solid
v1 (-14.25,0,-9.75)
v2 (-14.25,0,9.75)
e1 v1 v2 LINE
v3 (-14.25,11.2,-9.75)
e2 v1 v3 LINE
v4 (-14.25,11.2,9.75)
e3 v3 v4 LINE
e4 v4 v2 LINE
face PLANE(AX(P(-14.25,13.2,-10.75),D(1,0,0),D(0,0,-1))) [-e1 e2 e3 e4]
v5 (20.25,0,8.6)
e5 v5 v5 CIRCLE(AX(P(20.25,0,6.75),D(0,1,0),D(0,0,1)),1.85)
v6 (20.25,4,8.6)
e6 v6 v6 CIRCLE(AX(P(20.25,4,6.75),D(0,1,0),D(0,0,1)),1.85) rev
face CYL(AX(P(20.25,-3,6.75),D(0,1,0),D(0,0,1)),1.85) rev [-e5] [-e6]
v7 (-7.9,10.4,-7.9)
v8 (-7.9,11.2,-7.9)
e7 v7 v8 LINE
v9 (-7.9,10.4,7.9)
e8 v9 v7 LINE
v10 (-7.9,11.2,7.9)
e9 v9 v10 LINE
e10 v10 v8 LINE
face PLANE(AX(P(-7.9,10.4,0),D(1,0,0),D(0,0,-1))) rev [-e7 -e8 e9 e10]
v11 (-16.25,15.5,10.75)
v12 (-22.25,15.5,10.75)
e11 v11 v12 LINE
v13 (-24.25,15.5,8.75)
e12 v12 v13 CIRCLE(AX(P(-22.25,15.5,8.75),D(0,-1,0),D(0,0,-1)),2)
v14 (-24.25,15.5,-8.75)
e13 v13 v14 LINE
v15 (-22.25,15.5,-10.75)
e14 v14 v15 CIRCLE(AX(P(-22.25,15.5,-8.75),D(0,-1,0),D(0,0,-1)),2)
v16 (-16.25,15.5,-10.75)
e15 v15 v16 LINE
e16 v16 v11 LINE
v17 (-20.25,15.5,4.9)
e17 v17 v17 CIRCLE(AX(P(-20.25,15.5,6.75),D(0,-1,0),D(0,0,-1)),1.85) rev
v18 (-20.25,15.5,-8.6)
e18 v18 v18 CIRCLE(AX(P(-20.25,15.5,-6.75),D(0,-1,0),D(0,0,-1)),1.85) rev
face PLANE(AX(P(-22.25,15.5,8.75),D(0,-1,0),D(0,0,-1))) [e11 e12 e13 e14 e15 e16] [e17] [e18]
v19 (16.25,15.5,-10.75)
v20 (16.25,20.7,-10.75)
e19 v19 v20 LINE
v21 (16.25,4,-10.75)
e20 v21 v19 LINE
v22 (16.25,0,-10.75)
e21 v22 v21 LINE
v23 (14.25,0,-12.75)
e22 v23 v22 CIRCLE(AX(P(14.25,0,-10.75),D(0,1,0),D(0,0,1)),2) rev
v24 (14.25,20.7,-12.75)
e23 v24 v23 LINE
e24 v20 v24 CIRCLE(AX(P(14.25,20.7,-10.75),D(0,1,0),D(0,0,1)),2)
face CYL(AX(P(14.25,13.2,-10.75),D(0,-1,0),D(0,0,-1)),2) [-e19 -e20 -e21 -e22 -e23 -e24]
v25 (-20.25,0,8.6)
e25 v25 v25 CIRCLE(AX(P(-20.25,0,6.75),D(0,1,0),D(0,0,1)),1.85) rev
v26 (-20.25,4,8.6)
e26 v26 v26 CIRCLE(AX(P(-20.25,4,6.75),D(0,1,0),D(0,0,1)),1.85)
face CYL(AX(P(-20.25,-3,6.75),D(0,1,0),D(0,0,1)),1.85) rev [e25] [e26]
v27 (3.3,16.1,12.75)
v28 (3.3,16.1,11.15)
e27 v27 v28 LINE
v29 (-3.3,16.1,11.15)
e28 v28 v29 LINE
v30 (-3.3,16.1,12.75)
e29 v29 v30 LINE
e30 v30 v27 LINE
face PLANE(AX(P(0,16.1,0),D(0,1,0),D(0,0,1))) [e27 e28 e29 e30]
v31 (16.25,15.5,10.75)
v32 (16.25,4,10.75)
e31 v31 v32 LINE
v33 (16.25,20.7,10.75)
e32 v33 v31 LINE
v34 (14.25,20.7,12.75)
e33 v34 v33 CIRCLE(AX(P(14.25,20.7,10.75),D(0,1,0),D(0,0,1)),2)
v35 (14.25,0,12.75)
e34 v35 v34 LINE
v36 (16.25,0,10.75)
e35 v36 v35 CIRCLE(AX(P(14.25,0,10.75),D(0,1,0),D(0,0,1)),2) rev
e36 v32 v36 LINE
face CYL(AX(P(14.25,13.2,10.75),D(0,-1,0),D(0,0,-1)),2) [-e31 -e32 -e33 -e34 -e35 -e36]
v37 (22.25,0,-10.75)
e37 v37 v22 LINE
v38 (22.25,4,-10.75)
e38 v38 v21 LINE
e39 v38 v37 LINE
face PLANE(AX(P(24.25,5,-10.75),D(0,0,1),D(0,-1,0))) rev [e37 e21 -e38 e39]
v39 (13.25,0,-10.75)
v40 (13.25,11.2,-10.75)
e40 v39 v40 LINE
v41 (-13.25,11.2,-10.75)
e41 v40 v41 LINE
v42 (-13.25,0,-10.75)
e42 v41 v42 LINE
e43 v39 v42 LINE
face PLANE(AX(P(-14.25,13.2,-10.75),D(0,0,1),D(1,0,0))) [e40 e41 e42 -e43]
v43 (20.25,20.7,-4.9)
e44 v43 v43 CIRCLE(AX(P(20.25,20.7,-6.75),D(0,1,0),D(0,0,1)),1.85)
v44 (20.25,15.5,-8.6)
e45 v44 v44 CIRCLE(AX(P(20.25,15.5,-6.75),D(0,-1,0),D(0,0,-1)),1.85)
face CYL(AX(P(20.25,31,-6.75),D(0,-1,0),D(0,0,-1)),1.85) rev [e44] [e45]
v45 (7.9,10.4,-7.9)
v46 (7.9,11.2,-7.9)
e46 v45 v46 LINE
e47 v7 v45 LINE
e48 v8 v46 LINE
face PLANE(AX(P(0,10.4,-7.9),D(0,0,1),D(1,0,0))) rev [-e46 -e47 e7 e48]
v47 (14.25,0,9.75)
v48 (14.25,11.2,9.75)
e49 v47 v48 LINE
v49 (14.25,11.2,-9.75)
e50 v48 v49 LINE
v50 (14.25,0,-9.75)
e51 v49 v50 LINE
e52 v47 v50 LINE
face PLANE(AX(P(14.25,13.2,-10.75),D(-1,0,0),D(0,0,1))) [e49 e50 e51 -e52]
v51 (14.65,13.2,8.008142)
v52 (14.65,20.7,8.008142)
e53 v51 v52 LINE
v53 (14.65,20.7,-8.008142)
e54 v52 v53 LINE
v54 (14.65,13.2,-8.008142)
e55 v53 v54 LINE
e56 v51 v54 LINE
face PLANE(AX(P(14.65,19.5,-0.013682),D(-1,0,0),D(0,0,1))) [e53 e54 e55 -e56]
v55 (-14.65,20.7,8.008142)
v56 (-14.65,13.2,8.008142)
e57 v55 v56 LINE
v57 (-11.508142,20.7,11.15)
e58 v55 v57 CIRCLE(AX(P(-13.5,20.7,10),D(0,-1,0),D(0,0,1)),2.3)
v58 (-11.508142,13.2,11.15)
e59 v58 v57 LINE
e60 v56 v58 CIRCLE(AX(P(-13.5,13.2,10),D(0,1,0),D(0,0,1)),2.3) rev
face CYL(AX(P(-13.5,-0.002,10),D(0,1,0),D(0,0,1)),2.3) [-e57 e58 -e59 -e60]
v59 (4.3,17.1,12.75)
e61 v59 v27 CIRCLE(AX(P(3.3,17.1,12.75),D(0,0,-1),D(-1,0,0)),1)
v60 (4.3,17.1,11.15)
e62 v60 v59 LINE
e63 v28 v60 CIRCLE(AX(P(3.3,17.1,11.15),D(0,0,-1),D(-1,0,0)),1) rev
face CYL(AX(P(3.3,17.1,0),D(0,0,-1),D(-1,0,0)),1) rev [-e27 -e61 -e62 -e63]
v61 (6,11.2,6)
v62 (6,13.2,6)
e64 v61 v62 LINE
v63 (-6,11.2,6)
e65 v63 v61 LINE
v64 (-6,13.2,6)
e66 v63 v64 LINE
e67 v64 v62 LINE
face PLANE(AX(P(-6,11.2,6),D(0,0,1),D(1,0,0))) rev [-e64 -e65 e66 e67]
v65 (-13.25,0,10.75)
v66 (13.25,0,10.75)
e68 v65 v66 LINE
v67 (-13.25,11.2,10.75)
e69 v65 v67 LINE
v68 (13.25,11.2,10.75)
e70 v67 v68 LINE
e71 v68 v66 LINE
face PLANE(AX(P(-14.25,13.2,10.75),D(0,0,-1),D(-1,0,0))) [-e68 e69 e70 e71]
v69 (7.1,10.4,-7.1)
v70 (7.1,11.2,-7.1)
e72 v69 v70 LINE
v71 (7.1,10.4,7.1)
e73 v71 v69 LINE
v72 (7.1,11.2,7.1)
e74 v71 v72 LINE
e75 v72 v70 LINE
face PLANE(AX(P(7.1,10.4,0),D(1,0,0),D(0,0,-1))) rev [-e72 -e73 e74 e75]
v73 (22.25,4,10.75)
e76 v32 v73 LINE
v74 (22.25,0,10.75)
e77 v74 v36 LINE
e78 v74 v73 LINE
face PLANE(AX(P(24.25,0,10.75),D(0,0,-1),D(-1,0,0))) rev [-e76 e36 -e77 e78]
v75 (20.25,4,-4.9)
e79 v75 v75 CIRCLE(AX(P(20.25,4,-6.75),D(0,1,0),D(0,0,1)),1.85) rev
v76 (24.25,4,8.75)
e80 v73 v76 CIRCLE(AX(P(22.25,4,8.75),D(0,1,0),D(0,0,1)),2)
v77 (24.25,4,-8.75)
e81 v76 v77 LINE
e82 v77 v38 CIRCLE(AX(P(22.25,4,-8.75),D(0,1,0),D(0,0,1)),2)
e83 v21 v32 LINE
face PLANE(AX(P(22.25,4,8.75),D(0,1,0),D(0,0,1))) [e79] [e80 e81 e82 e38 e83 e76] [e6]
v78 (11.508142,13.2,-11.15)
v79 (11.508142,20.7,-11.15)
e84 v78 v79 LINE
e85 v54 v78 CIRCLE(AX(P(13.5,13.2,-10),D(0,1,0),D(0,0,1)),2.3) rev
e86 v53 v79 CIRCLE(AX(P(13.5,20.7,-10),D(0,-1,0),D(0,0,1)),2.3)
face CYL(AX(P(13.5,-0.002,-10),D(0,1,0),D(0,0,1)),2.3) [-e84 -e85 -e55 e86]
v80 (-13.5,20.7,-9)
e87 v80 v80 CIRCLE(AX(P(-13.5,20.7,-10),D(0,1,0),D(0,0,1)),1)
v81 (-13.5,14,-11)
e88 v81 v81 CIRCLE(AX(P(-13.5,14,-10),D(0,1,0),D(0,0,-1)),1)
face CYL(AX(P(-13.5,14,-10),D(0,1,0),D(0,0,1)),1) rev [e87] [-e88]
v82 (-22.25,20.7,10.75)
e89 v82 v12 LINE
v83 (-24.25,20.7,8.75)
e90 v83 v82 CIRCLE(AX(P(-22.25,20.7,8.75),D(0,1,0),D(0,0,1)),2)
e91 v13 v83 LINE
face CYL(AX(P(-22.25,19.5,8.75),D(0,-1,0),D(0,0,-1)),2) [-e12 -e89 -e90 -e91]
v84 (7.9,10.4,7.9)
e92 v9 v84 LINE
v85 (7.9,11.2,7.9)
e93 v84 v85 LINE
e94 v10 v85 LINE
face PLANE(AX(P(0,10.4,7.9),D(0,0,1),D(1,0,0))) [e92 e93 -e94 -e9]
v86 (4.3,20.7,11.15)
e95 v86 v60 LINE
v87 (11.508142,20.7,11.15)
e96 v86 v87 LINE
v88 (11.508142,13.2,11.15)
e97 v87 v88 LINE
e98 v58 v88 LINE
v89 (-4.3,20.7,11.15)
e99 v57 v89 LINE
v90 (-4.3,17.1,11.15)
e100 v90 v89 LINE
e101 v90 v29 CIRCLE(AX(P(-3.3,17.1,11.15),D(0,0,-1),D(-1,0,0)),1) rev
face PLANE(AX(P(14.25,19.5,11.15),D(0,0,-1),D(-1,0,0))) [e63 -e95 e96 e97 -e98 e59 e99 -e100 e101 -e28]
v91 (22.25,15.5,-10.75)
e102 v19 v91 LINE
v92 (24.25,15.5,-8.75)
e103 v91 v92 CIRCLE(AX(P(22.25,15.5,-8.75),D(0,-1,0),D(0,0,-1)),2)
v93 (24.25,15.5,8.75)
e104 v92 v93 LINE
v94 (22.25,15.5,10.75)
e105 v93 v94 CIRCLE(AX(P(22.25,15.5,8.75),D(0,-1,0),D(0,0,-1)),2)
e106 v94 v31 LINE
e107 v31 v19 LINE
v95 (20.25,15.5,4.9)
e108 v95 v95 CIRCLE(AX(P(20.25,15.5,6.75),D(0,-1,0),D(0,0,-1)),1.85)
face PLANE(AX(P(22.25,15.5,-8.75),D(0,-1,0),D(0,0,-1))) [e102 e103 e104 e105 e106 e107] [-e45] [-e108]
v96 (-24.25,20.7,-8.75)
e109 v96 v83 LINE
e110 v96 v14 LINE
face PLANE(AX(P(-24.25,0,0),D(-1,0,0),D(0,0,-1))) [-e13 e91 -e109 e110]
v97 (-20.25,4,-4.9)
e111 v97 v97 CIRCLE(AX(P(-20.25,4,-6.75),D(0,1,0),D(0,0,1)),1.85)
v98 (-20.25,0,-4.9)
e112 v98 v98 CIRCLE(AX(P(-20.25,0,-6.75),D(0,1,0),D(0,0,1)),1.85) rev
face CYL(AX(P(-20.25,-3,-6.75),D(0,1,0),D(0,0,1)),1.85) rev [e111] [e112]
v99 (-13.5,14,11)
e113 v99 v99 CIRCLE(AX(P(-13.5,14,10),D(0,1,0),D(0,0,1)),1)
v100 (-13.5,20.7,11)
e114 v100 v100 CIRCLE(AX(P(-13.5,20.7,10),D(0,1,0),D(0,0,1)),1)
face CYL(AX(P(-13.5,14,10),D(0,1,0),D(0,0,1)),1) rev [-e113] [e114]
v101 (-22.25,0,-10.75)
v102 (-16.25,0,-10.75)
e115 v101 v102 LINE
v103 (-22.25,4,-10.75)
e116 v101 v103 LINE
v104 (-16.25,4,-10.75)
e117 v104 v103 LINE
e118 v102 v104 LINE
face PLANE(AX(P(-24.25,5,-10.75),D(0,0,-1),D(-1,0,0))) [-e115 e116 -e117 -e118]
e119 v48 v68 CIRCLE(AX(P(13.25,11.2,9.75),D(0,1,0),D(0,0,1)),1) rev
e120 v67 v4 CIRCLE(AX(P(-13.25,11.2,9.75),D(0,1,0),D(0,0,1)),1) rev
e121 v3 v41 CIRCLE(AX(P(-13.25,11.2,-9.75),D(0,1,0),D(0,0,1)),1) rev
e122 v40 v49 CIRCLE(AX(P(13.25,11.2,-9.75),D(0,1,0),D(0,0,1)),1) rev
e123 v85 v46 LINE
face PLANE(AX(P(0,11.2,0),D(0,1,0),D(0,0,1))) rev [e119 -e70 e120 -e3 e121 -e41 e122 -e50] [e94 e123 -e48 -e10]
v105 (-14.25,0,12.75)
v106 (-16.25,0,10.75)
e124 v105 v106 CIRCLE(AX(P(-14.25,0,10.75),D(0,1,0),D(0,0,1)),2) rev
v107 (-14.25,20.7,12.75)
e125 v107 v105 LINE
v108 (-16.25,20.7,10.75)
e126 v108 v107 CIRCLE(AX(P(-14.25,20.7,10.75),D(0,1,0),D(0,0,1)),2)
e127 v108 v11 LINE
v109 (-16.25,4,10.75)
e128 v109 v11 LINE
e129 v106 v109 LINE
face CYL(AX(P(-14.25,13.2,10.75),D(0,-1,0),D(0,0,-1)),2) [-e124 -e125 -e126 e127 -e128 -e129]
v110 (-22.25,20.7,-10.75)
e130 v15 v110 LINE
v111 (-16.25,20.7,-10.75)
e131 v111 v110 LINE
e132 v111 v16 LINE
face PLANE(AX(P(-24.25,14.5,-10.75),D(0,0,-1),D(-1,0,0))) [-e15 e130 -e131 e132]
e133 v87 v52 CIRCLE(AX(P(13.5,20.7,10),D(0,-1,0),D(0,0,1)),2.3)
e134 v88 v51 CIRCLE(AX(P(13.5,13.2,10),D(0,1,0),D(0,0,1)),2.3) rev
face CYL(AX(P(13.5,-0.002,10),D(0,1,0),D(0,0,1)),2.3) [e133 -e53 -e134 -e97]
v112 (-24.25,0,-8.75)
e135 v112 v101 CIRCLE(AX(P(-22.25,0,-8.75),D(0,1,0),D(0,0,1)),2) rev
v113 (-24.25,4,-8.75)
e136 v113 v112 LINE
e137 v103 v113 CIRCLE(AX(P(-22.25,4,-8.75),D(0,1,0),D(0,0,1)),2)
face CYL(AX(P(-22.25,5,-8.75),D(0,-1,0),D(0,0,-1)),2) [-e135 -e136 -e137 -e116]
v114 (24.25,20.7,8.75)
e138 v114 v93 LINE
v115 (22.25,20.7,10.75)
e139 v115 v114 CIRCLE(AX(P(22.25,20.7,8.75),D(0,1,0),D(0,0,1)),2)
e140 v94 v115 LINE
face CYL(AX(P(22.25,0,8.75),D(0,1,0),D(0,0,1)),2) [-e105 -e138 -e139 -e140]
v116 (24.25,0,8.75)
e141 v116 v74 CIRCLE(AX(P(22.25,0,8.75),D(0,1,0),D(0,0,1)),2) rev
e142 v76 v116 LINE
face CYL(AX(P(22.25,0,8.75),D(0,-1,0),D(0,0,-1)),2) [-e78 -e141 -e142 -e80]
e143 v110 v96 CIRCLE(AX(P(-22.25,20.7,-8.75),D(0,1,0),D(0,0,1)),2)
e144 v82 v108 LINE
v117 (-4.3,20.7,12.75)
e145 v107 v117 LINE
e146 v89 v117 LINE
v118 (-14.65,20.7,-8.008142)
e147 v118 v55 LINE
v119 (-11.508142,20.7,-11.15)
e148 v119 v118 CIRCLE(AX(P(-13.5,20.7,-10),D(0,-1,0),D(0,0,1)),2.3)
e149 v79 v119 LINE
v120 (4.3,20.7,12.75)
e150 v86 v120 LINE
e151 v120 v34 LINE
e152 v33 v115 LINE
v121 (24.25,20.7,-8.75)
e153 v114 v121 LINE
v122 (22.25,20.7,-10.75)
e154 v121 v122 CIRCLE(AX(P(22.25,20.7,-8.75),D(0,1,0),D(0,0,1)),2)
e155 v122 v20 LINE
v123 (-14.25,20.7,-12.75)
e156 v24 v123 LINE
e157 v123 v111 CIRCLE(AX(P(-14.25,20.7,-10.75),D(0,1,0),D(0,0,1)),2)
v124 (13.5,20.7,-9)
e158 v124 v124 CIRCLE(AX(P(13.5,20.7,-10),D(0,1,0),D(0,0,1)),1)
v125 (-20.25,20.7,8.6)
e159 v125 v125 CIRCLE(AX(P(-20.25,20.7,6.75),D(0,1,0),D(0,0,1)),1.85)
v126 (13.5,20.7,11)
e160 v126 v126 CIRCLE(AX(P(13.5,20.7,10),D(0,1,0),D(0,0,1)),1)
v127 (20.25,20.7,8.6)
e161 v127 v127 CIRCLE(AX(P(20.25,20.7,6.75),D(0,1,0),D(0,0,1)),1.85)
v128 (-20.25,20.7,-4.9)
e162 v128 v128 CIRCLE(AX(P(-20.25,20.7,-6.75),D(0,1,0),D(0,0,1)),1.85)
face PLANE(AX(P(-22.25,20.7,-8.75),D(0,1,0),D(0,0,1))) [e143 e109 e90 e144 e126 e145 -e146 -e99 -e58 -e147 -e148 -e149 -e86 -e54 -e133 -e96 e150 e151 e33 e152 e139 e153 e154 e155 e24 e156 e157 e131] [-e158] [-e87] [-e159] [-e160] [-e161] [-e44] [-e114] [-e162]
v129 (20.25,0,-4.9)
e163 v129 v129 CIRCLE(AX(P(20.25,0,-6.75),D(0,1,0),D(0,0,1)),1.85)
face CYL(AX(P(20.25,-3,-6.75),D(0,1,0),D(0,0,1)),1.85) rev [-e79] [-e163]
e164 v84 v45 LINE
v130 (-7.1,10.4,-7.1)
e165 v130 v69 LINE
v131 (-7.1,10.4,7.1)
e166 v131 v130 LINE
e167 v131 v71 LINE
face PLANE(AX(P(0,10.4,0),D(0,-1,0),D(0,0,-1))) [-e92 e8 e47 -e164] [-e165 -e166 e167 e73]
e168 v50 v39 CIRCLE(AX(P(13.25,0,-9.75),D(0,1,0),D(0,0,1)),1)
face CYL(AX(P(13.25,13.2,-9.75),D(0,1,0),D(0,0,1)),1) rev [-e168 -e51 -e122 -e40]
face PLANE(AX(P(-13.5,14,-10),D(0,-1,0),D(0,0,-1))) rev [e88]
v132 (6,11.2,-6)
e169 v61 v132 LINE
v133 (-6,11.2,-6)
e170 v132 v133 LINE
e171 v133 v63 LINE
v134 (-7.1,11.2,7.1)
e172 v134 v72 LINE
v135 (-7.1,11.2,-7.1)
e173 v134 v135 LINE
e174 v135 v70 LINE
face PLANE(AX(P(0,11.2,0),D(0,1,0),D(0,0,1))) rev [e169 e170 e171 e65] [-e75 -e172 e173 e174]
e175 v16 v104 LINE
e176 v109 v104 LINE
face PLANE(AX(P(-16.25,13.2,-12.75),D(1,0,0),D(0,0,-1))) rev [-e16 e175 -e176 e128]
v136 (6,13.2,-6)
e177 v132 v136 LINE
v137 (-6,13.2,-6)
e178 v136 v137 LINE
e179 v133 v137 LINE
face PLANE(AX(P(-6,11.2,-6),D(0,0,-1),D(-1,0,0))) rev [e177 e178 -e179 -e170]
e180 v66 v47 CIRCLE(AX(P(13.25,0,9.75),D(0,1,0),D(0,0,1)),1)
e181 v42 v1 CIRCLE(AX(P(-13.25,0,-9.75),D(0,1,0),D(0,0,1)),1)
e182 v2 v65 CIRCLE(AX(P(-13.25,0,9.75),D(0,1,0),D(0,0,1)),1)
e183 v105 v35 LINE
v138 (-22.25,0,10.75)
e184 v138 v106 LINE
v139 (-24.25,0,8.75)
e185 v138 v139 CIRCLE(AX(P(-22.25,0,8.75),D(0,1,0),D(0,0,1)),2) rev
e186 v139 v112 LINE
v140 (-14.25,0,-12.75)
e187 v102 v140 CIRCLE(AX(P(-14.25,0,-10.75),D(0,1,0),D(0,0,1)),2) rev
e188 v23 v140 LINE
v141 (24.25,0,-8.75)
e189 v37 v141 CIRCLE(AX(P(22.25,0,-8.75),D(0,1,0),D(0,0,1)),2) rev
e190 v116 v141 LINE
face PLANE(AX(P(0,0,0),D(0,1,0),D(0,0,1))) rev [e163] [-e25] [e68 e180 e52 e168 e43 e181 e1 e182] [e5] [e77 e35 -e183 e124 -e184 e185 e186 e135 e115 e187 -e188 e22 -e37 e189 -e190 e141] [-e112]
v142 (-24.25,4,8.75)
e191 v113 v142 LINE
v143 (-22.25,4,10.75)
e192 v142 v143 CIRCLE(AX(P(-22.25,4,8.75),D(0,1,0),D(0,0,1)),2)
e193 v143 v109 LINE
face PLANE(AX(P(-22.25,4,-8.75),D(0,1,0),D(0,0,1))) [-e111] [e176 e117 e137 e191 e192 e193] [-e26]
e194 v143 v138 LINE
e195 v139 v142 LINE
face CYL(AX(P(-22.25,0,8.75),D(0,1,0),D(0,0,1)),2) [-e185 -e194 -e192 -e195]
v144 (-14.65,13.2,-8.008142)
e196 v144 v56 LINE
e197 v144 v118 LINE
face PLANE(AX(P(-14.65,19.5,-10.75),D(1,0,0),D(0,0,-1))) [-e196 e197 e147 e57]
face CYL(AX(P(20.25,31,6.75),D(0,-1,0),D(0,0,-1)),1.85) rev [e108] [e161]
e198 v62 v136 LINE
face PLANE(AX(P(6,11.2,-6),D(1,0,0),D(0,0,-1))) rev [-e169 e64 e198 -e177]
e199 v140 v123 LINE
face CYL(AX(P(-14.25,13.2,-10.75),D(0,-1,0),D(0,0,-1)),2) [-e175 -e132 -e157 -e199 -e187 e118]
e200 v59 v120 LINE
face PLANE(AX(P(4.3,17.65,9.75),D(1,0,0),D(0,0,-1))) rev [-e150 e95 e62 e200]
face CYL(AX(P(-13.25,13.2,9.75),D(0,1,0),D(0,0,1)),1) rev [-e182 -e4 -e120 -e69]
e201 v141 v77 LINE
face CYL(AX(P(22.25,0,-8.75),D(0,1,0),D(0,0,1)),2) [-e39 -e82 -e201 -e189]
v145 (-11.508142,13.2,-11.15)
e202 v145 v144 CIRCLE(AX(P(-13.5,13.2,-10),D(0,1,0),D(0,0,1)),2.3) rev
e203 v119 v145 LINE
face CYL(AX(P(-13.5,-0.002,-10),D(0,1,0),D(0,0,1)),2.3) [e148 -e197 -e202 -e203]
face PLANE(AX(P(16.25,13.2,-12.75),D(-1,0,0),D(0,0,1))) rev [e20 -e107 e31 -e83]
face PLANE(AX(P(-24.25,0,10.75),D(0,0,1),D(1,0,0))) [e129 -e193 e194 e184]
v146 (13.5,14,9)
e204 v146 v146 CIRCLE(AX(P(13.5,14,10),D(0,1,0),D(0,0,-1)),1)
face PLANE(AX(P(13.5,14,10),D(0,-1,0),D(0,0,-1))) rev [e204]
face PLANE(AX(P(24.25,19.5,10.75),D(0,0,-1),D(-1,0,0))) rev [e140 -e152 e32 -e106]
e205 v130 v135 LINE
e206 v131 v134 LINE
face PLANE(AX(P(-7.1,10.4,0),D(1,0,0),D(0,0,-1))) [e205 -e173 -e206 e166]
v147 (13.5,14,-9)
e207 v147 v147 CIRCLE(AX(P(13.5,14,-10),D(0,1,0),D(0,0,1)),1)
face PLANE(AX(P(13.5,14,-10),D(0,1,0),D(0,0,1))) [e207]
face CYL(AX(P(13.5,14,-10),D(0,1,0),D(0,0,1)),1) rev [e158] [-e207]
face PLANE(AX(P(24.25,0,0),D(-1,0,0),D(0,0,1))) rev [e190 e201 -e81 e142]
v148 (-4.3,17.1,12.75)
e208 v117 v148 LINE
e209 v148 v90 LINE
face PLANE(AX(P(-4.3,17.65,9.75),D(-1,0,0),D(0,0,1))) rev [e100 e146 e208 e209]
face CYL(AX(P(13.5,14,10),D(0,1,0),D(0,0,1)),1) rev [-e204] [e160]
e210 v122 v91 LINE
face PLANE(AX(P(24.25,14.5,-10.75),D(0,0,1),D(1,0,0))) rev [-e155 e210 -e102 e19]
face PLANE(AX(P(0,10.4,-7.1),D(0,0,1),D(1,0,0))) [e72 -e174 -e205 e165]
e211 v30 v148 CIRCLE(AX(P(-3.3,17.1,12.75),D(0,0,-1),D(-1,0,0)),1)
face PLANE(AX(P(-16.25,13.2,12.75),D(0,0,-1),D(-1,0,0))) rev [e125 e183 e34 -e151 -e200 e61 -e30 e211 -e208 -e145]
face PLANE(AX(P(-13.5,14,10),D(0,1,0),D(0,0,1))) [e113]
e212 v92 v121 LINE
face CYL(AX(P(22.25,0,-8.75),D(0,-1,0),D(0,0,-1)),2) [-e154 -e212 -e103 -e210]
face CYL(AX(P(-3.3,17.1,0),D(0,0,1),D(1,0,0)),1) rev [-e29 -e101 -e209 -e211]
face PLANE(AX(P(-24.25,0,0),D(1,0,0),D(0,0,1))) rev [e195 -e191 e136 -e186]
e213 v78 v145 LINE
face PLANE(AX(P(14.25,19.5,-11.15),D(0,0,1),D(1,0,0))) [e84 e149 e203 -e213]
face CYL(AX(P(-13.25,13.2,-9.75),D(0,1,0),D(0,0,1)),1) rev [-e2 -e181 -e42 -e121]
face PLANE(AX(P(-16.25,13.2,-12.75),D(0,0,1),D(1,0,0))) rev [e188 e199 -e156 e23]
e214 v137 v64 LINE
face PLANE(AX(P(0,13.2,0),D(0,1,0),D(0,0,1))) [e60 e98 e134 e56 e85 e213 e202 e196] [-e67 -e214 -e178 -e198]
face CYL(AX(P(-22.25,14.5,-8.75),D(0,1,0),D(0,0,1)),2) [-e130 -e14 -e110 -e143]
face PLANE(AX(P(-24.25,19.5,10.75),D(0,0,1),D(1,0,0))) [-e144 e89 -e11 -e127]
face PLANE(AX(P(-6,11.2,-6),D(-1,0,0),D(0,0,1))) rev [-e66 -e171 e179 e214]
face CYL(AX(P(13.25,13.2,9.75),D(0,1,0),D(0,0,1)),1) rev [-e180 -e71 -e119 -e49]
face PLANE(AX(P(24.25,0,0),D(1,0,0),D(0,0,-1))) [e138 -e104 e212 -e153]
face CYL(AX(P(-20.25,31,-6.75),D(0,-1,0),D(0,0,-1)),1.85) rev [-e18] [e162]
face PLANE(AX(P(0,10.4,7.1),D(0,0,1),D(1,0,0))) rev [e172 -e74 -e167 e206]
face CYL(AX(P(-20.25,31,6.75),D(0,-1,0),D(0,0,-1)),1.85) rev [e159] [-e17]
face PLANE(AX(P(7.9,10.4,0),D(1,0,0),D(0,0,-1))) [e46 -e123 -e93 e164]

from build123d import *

# Parameters (mm, degrees)
SKETCH_1_W             = 32.5
SKETCH_1_H             = 25.5
SKETCH_1_W_2           = 28.5
SKETCH_1_H_2           = 21.5
EXTRUDE_1_DEPTH        = 13.2
SKETCH_2_W             = 28.5
SKETCH_2_H             = 21.5
SKETCH_2_W_2           = 12
SKETCH_2_H_2           = 12
EXTRUDE_2_DEPTH        = 2
EXTRUDE_3_DEPTH        = 6.3
EXTRUDE_4_REACH        = 30.406
SKETCH_6_R             = 2.7
SKETCH_7_R             = 1
CUT_EXTRUDE_3_DEPTH    = 5.5
SKETCH_10_W            = 15.8
SKETCH_10_H            = 15.8
SKETCH_10_W_2          = 14.2
SKETCH_10_H_2          = 14.2
EXTRUDE_5_DEPTH        = 0.8
CUT_EXTRUDE_5_DEPTH    = 3
FILLET_6_R             = 0.5
FILLET_1_R             = 2
FILLET_2_R             = 1
SKETCH_12_W            = 21.5
SKETCH_12_H            = 5
EXTRUDE_7_DEPTH        = 8
SKETCH_13_R            = 1.85
CUT_EXTRUDE_7_DEPTH    = 8
FILLET_7_R             = 2
SKETCH_15_W            = 21.5
SKETCH_15_H            = 5
EXTRUDE_8_DEPTH        = 8
CUT_EXTRUDE_START      = 26
SKETCH_13_3_R          = 1.85
CUT_EXTRUDE_8_DEPTH    = 26
FILLET_8_R             = 2
FILLET_7_OF_MIRROR_1_R = 2
FILLET_8_OF_MIRROR_1_R = 2
MOVE_START             = 13.2
MOVE_FACE_2_DEPTH      = 6.3
MOVE_FACE_3_BY         = 0.3
MOVE_FACE_3_2_BY       = 0.3
MOVE_FACE_3_3_BY       = 0.3
MOVE_FACE_3_4_BY       = 0.3
MOVE_FACE_3_5_BY       = 0.3
MOVE_FACE_3_6_BY       = 0.3
MOVE_FACE_3_7_BY       = 0.3
MOVE_FACE_3_8_BY       = 0.3
MOVE_FACE_3_9_BY       = 0.3
MOVE_FACE_3_10_BY      = 0.3
MOVE_FACE_3_11_BY      = 0.3
MOVE_FACE_3_12_BY      = 0.3
CUT_EXTRUDE_9_DEPTH    = 1
CUT_EXTRUDE_10_DEPTH   = 1
CUT_EXTRUDE_11_DEPTH   = 1
CUT_EXTRUDE_12_DEPTH   = 1
EXTRUDE_START          = 1.2
SKETCH_23_R            = 1.85
SKETCH_23_R_2          = 1
EXTRUDE_9_DEPTH        = 1.2
SKETCH_25_W            = 2
SKETCH_25_H            = 4.682452006
CUT_EXTRUDE_13_DEPTH   = 8.6
EXTRUDE_11_OUTLINE_W   = 8.6
EXTRUDE_11_OUTLINE_H   = 1.6
EXTRUDE_11_DEPTH       = 1.6
FILLET_9_R             = 1


# Read off the part's stored shape, not the designer's step: 移动面2, 凸台-拉伸11
with BuildPart() as part:
    # 草图1 → 凸台-拉伸1 (new body)
    with BuildSketch(Plane(origin=(0, 0, 0), x_dir=(1, 0, 0), z_dir=(0, 1, 0))):
        Rectangle(SKETCH_1_W, SKETCH_1_H)
        Rectangle(SKETCH_1_W_2, SKETCH_1_H_2, mode=Mode.SUBTRACT)
    extrude(amount=EXTRUDE_1_DEPTH)

    # 草图2 → 凸台-拉伸2 (add)
    with BuildSketch(Plane(origin=(0, 13.2, 0), x_dir=(1, 0, 0), z_dir=(0, 1, 0))):
        Rectangle(SKETCH_2_W, SKETCH_2_H)
        Rectangle(SKETCH_2_W_2, SKETCH_2_H_2, mode=Mode.SUBTRACT)
    extrude(amount=-EXTRUDE_2_DEPTH)

    # 草图3 → 凸台-拉伸3 (add)
    with BuildSketch(Plane(origin=(0, 13.2, 0), x_dir=(1, 0, 0), z_dir=(0, 1, 0))):
        Polygon((-16.25, -12.75), (-16.25, 12.75), (16.25, 12.75), (16.25, -0.040360215), (16.25, -12.75), align=None)
        Polygon((14.25, 0.013681835), (14.25, 10.75), (-14.25, 10.75), (-14.25, -10.75), (14.25, -10.75), align=None, mode=Mode.SUBTRACT)
    extrude(amount=EXTRUDE_3_DEPTH)

    # 草图6 → 凸台-拉伸4 (add, up to next)
    with BuildSketch(Plane(origin=(0, 19.5, 0), x_dir=(1, 0, 0), z_dir=(0, 1, 0)), mode=Mode.PRIVATE) as extrude_4_sk1:
        with Locations((13.5, 10)):
            Circle(SKETCH_6_R)
    extrude_4_tool1 = extrude(extrude_4_sk1.sketch, amount=-EXTRUDE_4_REACH, mode=Mode.PRIVATE) - part.part
    # 草图6 → 凸台-拉伸4 (add, up to next)
    with BuildSketch(Plane(origin=(0, 19.5, 0), x_dir=(1, 0, 0), z_dir=(0, 1, 0)), mode=Mode.PRIVATE) as extrude_4_sk2:
        with Locations((13.5, -10)):
            Circle(SKETCH_6_R)
    extrude_4_tool2 = extrude(extrude_4_sk2.sketch, amount=-EXTRUDE_4_REACH, mode=Mode.PRIVATE) - part.part
    # 草图6 → 凸台-拉伸4 (add, up to next)
    with BuildSketch(Plane(origin=(0, 19.5, 0), x_dir=(1, 0, 0), z_dir=(0, 1, 0)), mode=Mode.PRIVATE) as extrude_4_sk3:
        with Locations((-13.5, -10)):
            Circle(SKETCH_6_R)
    extrude_4_tool3 = extrude(extrude_4_sk3.sketch, amount=-EXTRUDE_4_REACH, mode=Mode.PRIVATE) - part.part
    # 草图6 → 凸台-拉伸4 (add, up to next)
    with BuildSketch(Plane(origin=(0, 19.5, 0), x_dir=(1, 0, 0), z_dir=(0, 1, 0)), mode=Mode.PRIVATE) as extrude_4_sk4:
        with Locations((-13.5, 10)):
            Circle(SKETCH_6_R)
    extrude_4_tool4 = extrude(extrude_4_sk4.sketch, amount=-EXTRUDE_4_REACH, mode=Mode.PRIVATE) - part.part
    add(extrude_4_tool1.solids().sort_by_distance((13.5, 19.5, -10))[0])
    add(extrude_4_tool2.solids().sort_by_distance((13.5, 19.5, 10))[0])
    add(extrude_4_tool3.solids().sort_by_distance((-13.5, 19.5, 10))[0])
    add(extrude_4_tool4.solids().sort_by_distance((-13.5, 19.5, -10))[0])

    # 草图7 → 切除-拉伸3 (cut)
    with BuildSketch(Plane(origin=(0, 19.5, 0), x_dir=(1, 0, 0), z_dir=(0, 1, 0))):
        with Locations(Location((13.5, 10, 0), (0, 0, 270))):
            Circle(SKETCH_7_R)
        with Locations(Location((13.5, -10, 0), (0, 0, 90))):
            Circle(SKETCH_7_R)
        with Locations(Location((-13.5, -10, 0), (0, 0, 270))):
            Circle(SKETCH_7_R)
        with Locations(Location((-13.5, 10, 0), (0, 0, 90))):
            Circle(SKETCH_7_R)
    extrude(amount=-CUT_EXTRUDE_3_DEPTH, mode=Mode.SUBTRACT)

    # 草图10 → 凸台-拉伸5 (add)
    with BuildSketch(Plane.XZ.offset(-11.2)):
        Rectangle(SKETCH_10_W, SKETCH_10_H)
        Rectangle(SKETCH_10_W_2, SKETCH_10_H_2, mode=Mode.SUBTRACT)
    extrude(amount=EXTRUDE_5_DEPTH)

    # 草图11 → 切除-拉伸5 (cut)
    with BuildSketch(Plane.XY.offset(12.75)):
        Polygon((-4, 17.65), (4, 17.65), (4, 15.8), (3, 14.8), (-3, 14.8), (-4, 15.8), align=None)
    extrude(amount=-CUT_EXTRUDE_5_DEPTH, mode=Mode.SUBTRACT)

    # 圆角6
    fillet_6_edges = [part.edges().sort_by_distance(p)[0] for p in [
        (4, 17.65, 11.75),
        (4, 15.8, 11.75),
        (3, 14.8, 11.75),
        (-3, 14.8, 11.75),
        (-4, 15.8, 11.75),
        (-4, 17.65, 11.75),
    ]]
    fillet(fillet_6_edges, radius=FILLET_6_R)

    # 圆角1
    fillet_1_edges = [part.edges().sort_by_distance(p)[0] for p in [
        (16.25, 9.75, 12.75),
        (-16.25, 9.75, 12.75),
        (-16.25, 9.75, -12.75),
        (16.25, 9.75, -12.75),
    ]]
    fillet(fillet_1_edges, radius=FILLET_1_R)

    # 圆角2
    fillet_2_edges = [part.edges().sort_by_distance(p)[0] for p in [
        (-14.25, 5.6, 10.75),
        (14.25, 5.6, 10.75),
        (-14.25, 5.6, -10.75),
        (14.25, 5.6, -10.75),
    ]]
    fillet(fillet_2_edges, radius=FILLET_2_R)

    # 草图12 → 凸台-拉伸7 (add)
    with BuildSketch(Plane(origin=(16.25, 0, 0), x_dir=(0, 0, -1), z_dir=(1, 0, 0))):
        with Locations((0, 2.5)):
            Rectangle(SKETCH_12_W, SKETCH_12_H)
    extrude_7 = extrude(amount=EXTRUDE_7_DEPTH)

    # 草图13 → 切除-拉伸7 (cut)
    with BuildSketch(Plane(origin=(0, 5, 0), x_dir=(1, 0, 0), z_dir=(0, 1, 0))):
        with Locations(Location((20.25, 6.75, 0), (0, 0, 270))):
            Circle(SKETCH_13_R)
        with Locations(Location((20.25, -6.75, 0), (0, 0, 270))):
            Circle(SKETCH_13_R)
    cut_extrude_7 = extrude(amount=-CUT_EXTRUDE_7_DEPTH, mode=Mode.SUBTRACT)

    # 圆角7
    fillet_7_edges = [part.edges().sort_by_distance(p)[0] for p in [
        (24.25, 2.5, -10.75),
        (24.25, 2.5, 10.75),
    ]]
    fillet(fillet_7_edges, radius=FILLET_7_R)

    # 草图15 → 凸台-拉伸8 (add)
    with BuildSketch(Plane(origin=(16.25, 0, 0), x_dir=(0, 0, -1), z_dir=(1, 0, 0))):
        with Locations((0, 17)):
            Rectangle(SKETCH_15_W, SKETCH_15_H)
    extrude_8 = extrude(amount=EXTRUDE_8_DEPTH)

    # 草图13<3> → 切除-拉伸8 (cut)
    with BuildSketch(Plane(origin=(0, 5, 0), x_dir=(1, 0, 0), z_dir=(0, 1, 0)).offset(CUT_EXTRUDE_START)):
        with Locations(Location((20.25, 6.75, 0), (0, 0, 270))):
            Circle(SKETCH_13_3_R)
        with Locations(Location((20.25, -6.75, 0), (0, 0, 270))):
            Circle(SKETCH_13_3_R)
    cut_extrude_8 = extrude(amount=-CUT_EXTRUDE_8_DEPTH, mode=Mode.SUBTRACT)

    # 圆角8
    fillet_8_edges = [part.edges().sort_by_distance(p)[0] for p in [
        (24.25, 17, -10.75),
        (24.25, 17, 10.75),
    ]]
    fillet(fillet_8_edges, radius=FILLET_8_R)

    # 镜向1: 凸台-拉伸7, 切除-拉伸7, 凸台-拉伸8, 切除-拉伸8 across plane
    add(extrude_7.mirror(Plane(origin=(0, 0, 0), x_dir=(0, 0, 1), z_dir=(1, 0, 0))))
    add(cut_extrude_7.mirror(Plane(origin=(0, 0, 0), x_dir=(0, 0, 1), z_dir=(1, 0, 0))), mode=Mode.SUBTRACT)
    add(extrude_8.mirror(Plane(origin=(0, 0, 0), x_dir=(0, 0, 1), z_dir=(1, 0, 0))))
    add(cut_extrude_8.mirror(Plane(origin=(0, 0, 0), x_dir=(0, 0, 1), z_dir=(1, 0, 0))), mode=Mode.SUBTRACT)

    # 圆角7 of 镜向1
    fillet_7_of_mirror_1_edges = [part.edges().sort_by_distance(p)[0] for p in [
        (-24.25, 2.5, -10.75),
        (-24.25, 2.5, 10.75),
    ]]
    fillet(fillet_7_of_mirror_1_edges, radius=FILLET_7_OF_MIRROR_1_R)

    # 圆角8 of 镜向1
    fillet_8_of_mirror_1_edges = [part.edges().sort_by_distance(p)[0] for p in [
        (-24.25, 17, -10.75),
        (-24.25, 17, 10.75),
    ]]
    fillet(fillet_8_of_mirror_1_edges, radius=FILLET_8_OF_MIRROR_1_R)

    # Move Face 2 outline → Move Face 2 (cut)
    with BuildSketch(Plane(origin=(0, 0, 0), x_dir=(1, 0, 0), z_dir=(0, 1, 0)).offset(MOVE_START)):
        with BuildLine():
            ThreePointArc((11.508141571, -11.15), (11.873654403, -8.373654403), (14.65, -8.008141571))
            Line((14.65, -8.008141571), (14.65, 8.008141571))
            ThreePointArc((14.65, 8.008141571), (11.873654403, 8.373654403), (11.508141571, 11.15))
            Line((11.508141571, 11.15), (-11.508141571, 11.15))
            ThreePointArc((-11.508141571, 11.15), (-11.873654403, 8.373654403), (-14.65, 8.008141571))
            Line((-14.65, 8.008141571), (-14.65, -8.008141571))
            ThreePointArc((-14.65, -8.008141571), (-11.873654403, -8.373654403), (-11.508141571, -11.15))
            Line((-11.508141571, -11.15), (11.508141571, -11.15))
        make_face()
        with BuildLine():
            Line((10.90625753, -10.75), (-10.90625753, -10.75))
            ThreePointArc((-10.90625753, -10.75), (-11.590811691, -8.090811691), (-14.25, -7.40625753))
            Line((-14.25, -7.40625753), (-14.25, 7.40625753))
            ThreePointArc((-14.25, 7.40625753), (-11.590811691, 8.090811691), (-10.90625753, 10.75))
            Line((-10.90625753, 10.75), (10.90625753, 10.75))
            ThreePointArc((10.90625753, 10.75), (11.590811691, 8.090811691), (14.25, 7.40625753))
            Line((14.25, 7.40625753), (14.25, -7.40625753))
            ThreePointArc((14.25, -7.40625753), (11.590811691, -8.090811691), (10.90625753, -10.75))
        make_face(mode=Mode.SUBTRACT)
    extrude(amount=MOVE_FACE_2_DEPTH, mode=Mode.SUBTRACT)

    # Move Face 3: a curved face moved inward by 0.3
    add(Solid.thicken(part.faces().sort_by_distance((2.984234935, 14.838060234, 11.95))[0], -MOVE_FACE_3_BY), mode=Mode.SUBTRACT)

    # Move Face 3 2: a face moved inward by 0.3
    extrude(part.faces().sort_by_distance((3.5, 15.3, 11.95))[0], amount=MOVE_FACE_3_2_BY, dir=(0.707106781, -0.707106781, 0), mode=Mode.SUBTRACT)

    # Move Face 3 3: a curved face moved inward by 0.3
    add(Solid.thicken(part.faces().sort_by_distance((3.961939766, 15.815765065, 11.95))[0], -MOVE_FACE_3_3_BY), mode=Mode.SUBTRACT)

    # Move Face 3 4: a curved face moved inward by 0.3
    add(Solid.thicken(part.faces().sort_by_distance((3.853553391, 17.503553391, 11.95))[0], -MOVE_FACE_3_4_BY), mode=Mode.SUBTRACT)

    # Move Face 3 5: a face moved inward by 0.3
    extrude(part.faces().sort_by_distance((4, 16.578553391, 11.95))[0], amount=MOVE_FACE_3_5_BY, dir=(1, 0, 0), mode=Mode.SUBTRACT)

    # Move Face 3 6: a face moved inward by 0.3
    extrude(part.faces().sort_by_distance((0, 17.65, 11.95))[0], amount=MOVE_FACE_3_6_BY, dir=(0, 1, 0), mode=Mode.SUBTRACT)

    # Move Face 3 7: a curved face moved inward by 0.3
    add(Solid.thicken(part.faces().sort_by_distance((-3.853553391, 17.503553391, 11.95))[0], -MOVE_FACE_3_7_BY), mode=Mode.SUBTRACT)

    # Move Face 3 8: a face moved inward by 0.3
    extrude(part.faces().sort_by_distance((-4, 16.578553391, 11.95))[0], amount=MOVE_FACE_3_8_BY, dir=(-1, 0, 0), mode=Mode.SUBTRACT)

    # Move Face 3 9: a curved face moved inward by 0.3
    add(Solid.thicken(part.faces().sort_by_distance((-3.961939766, 15.815765065, 11.95))[0], -MOVE_FACE_3_9_BY), mode=Mode.SUBTRACT)

    # Move Face 3 10: a face moved inward by 0.3
    extrude(part.faces().sort_by_distance((-3.5, 15.3, 11.95))[0], amount=MOVE_FACE_3_10_BY, dir=(-0.707106781, -0.707106781, 0), mode=Mode.SUBTRACT)

    # Move Face 3 11: a curved face moved inward by 0.3
    add(Solid.thicken(part.faces().sort_by_distance((-2.984234935, 14.838060234, 11.95))[0], -MOVE_FACE_3_11_BY), mode=Mode.SUBTRACT)

    # Move Face 3 12: a face moved inward by 0.3
    extrude(part.faces().sort_by_distance((0, 14.8, 11.95))[0], amount=MOVE_FACE_3_12_BY, dir=(0, -1, 0), mode=Mode.SUBTRACT)

    # 草图17 → 切除-拉伸9 (cut)
    with BuildSketch(Plane(origin=(0, 5, 0), x_dir=(1, 0, 0), z_dir=(0, 1, 0))):
        with BuildLine():
            Line((16.25, -10.75), (22.25, -10.75))
            ThreePointArc((22.25, -10.75), (23.664213562, -10.164213562), (24.25, -8.75))
            Line((24.25, -8.75), (24.25, 8.75))
            ThreePointArc((24.25, 8.75), (23.664213562, 10.164213562), (22.25, 10.75))
            Line((22.25, 10.75), (16.25, 10.75))
            Line((16.25, 10.75), (16.25, -10.75))
        make_face()
    extrude(amount=-CUT_EXTRUDE_9_DEPTH, mode=Mode.SUBTRACT)

    # 草图18 → 切除-拉伸10 (cut)
    with BuildSketch(Plane.XZ.offset(-14.5)):
        with BuildLine():
            Line((24.25, -8.75), (24.25, 8.75))
            ThreePointArc((24.25, 8.75), (23.664213562, 10.164213562), (22.25, 10.75))
            Line((22.25, 10.75), (16.25, 10.75))
            Line((16.25, 10.75), (16.25, -10.75))
            Line((16.25, -10.75), (22.25, -10.75))
            ThreePointArc((22.25, -10.75), (23.664213562, -10.164213562), (24.25, -8.75))
        make_face()
    extrude(amount=-CUT_EXTRUDE_10_DEPTH, mode=Mode.SUBTRACT)

    # 草图19 → 切除-拉伸11 (cut)
    with BuildSketch(Plane.XZ.offset(-14.5)):
        with BuildLine():
            Line((-16.25, 10.75), (-22.25, 10.75))
            ThreePointArc((-22.25, 10.75), (-23.664213562, 10.164213562), (-24.25, 8.75))
            Line((-24.25, 8.75), (-24.25, -8.75))
            ThreePointArc((-24.25, -8.75), (-23.664213562, -10.164213562), (-22.25, -10.75))
            Line((-22.25, -10.75), (-16.25, -10.75))
            Line((-16.25, -10.75), (-16.25, 10.75))
        make_face()
    extrude(amount=-CUT_EXTRUDE_11_DEPTH, mode=Mode.SUBTRACT)

    # 草图20 → 切除-拉伸12 (cut)
    with BuildSketch(Plane(origin=(0, 5, 0), x_dir=(1, 0, 0), z_dir=(0, 1, 0))):
        with BuildLine():
            Line((-24.25, 8.75), (-24.25, -8.75))
            ThreePointArc((-24.25, -8.75), (-23.664213562, -10.164213562), (-22.25, -10.75))
            Line((-22.25, -10.75), (-16.25, -10.75))
            Line((-16.25, -10.75), (-16.25, 10.75))
            Line((-16.25, 10.75), (-22.25, 10.75))
            ThreePointArc((-22.25, 10.75), (-23.664213562, 10.164213562), (-24.25, 8.75))
        make_face()
    extrude(amount=-CUT_EXTRUDE_12_DEPTH, mode=Mode.SUBTRACT)

    # 草图23 → 凸台-拉伸9 (add)
    with BuildSketch(Plane(origin=(0, 19.5, 0), x_dir=(1, 0, 0), z_dir=(0, 1, 0)).offset(EXTRUDE_START)):
        with BuildLine():
            Line((-24.25, 8.75), (-24.25, -8.75))
            ThreePointArc((-24.25, -8.75), (-23.664213562, -10.164213562), (-22.25, -10.75))
            Line((-22.25, -10.75), (-16.25, -10.75))
            ThreePointArc((-16.25, -10.75), (-15.664213562, -12.164213562), (-14.25, -12.75))
            Line((-14.25, -12.75), (14.25, -12.75))
            ThreePointArc((14.25, -12.75), (15.664213562, -12.164213562), (16.25, -10.75))
            Line((16.25, -10.75), (22.25, -10.75))
            ThreePointArc((22.25, -10.75), (23.664213562, -10.164213562), (24.25, -8.75))
            Line((24.25, -8.75), (24.25, 8.75))
            ThreePointArc((24.25, 8.75), (23.664213562, 10.164213562), (22.25, 10.75))
            Line((22.25, 10.75), (16.25, 10.75))
            ThreePointArc((16.25, 10.75), (15.664213562, 12.164213562), (14.25, 12.75))
            Line((14.25, 12.75), (-14.25, 12.75))
            ThreePointArc((-14.25, 12.75), (-15.664213562, 12.164213562), (-16.25, 10.75))
            Line((-16.25, 10.75), (-22.25, 10.75))
            ThreePointArc((-22.25, 10.75), (-23.664213562, 10.164213562), (-24.25, 8.75))
        make_face()
        with Locations(Location((20.25, -6.75, 0), (0, 0, 90))):
            Circle(SKETCH_23_R, mode=Mode.SUBTRACT)
        with Locations(Location((20.25, 6.75, 0), (0, 0, 90))):
            Circle(SKETCH_23_R, mode=Mode.SUBTRACT)
        with Locations(Location((-20.25, -6.75, 0), (0, 0, 270))):
            Circle(SKETCH_23_R, mode=Mode.SUBTRACT)
        with Locations(Location((-20.25, 6.75, 0), (0, 0, 270))):
            Circle(SKETCH_23_R, mode=Mode.SUBTRACT)
        with Locations(Location((13.5, -10, 0), (0, 0, 270))):
            Circle(SKETCH_23_R_2, mode=Mode.SUBTRACT)
        with Locations(Location((13.5, 10, 0), (0, 0, 270))):
            Circle(SKETCH_23_R_2, mode=Mode.SUBTRACT)
        with Locations(Location((-13.5, -10, 0), (0, 0, 270))):
            Circle(SKETCH_23_R_2, mode=Mode.SUBTRACT)
        with Locations(Location((-13.5, 10, 0), (0, 0, 270))):
            Circle(SKETCH_23_R_2, mode=Mode.SUBTRACT)
        with BuildLine():
            Line((14.65, -8.008141571), (14.65, 8.008141571))
            ThreePointArc((14.65, 8.008141571), (11.873654403, 8.373654403), (11.508141571, 11.15))
            Line((11.508141571, 11.15), (-11.508141571, 11.15))
            ThreePointArc((-11.508141571, 11.15), (-11.873654403, 8.373654403), (-14.65, 8.008141571))
            Line((-14.65, 8.008141571), (-14.65, -8.008141571))
            ThreePointArc((-14.65, -8.008141571), (-11.873654403, -8.373654403), (-11.508141571, -11.15))
            Line((-11.508141571, -11.15), (11.508141571, -11.15))
            ThreePointArc((11.508141571, -11.15), (11.873654403, -8.373654403), (14.65, -8.008141571))
        make_face(mode=Mode.SUBTRACT)
    extrude(amount=-EXTRUDE_9_DEPTH)

    # 草图25 → 切除-拉伸13 (cut)
    with BuildSketch(Plane(origin=(-4.3, 0, 0), x_dir=(0, 0, -1), z_dir=(1, 0, 0))):
        with Locations((-11.75, 18.358773997)):
            Rectangle(SKETCH_25_W, SKETCH_25_H)
    extrude(amount=CUT_EXTRUDE_13_DEPTH, mode=Mode.SUBTRACT)

    # 凸台-拉伸11 outline → 凸台-拉伸11 (add)
    with BuildSketch(Plane(origin=(0, 14.5, 0), x_dir=(1, 0, 0), z_dir=(0, 1, 0))):
        with Locations((0, -11.95)):
            Rectangle(EXTRUDE_11_OUTLINE_W, EXTRUDE_11_OUTLINE_H)
    extrude(amount=EXTRUDE_11_DEPTH)

    # 圆角9
    fillet_9_edges = [part.edges().sort_by_distance(p)[0] for p in [
        (-4.3, 16.1, 11.95),
        (4.3, 16.1, 11.95),
    ]]
    fillet(fillet_9_edges, radius=FILLET_9_R)


solid = part.part
